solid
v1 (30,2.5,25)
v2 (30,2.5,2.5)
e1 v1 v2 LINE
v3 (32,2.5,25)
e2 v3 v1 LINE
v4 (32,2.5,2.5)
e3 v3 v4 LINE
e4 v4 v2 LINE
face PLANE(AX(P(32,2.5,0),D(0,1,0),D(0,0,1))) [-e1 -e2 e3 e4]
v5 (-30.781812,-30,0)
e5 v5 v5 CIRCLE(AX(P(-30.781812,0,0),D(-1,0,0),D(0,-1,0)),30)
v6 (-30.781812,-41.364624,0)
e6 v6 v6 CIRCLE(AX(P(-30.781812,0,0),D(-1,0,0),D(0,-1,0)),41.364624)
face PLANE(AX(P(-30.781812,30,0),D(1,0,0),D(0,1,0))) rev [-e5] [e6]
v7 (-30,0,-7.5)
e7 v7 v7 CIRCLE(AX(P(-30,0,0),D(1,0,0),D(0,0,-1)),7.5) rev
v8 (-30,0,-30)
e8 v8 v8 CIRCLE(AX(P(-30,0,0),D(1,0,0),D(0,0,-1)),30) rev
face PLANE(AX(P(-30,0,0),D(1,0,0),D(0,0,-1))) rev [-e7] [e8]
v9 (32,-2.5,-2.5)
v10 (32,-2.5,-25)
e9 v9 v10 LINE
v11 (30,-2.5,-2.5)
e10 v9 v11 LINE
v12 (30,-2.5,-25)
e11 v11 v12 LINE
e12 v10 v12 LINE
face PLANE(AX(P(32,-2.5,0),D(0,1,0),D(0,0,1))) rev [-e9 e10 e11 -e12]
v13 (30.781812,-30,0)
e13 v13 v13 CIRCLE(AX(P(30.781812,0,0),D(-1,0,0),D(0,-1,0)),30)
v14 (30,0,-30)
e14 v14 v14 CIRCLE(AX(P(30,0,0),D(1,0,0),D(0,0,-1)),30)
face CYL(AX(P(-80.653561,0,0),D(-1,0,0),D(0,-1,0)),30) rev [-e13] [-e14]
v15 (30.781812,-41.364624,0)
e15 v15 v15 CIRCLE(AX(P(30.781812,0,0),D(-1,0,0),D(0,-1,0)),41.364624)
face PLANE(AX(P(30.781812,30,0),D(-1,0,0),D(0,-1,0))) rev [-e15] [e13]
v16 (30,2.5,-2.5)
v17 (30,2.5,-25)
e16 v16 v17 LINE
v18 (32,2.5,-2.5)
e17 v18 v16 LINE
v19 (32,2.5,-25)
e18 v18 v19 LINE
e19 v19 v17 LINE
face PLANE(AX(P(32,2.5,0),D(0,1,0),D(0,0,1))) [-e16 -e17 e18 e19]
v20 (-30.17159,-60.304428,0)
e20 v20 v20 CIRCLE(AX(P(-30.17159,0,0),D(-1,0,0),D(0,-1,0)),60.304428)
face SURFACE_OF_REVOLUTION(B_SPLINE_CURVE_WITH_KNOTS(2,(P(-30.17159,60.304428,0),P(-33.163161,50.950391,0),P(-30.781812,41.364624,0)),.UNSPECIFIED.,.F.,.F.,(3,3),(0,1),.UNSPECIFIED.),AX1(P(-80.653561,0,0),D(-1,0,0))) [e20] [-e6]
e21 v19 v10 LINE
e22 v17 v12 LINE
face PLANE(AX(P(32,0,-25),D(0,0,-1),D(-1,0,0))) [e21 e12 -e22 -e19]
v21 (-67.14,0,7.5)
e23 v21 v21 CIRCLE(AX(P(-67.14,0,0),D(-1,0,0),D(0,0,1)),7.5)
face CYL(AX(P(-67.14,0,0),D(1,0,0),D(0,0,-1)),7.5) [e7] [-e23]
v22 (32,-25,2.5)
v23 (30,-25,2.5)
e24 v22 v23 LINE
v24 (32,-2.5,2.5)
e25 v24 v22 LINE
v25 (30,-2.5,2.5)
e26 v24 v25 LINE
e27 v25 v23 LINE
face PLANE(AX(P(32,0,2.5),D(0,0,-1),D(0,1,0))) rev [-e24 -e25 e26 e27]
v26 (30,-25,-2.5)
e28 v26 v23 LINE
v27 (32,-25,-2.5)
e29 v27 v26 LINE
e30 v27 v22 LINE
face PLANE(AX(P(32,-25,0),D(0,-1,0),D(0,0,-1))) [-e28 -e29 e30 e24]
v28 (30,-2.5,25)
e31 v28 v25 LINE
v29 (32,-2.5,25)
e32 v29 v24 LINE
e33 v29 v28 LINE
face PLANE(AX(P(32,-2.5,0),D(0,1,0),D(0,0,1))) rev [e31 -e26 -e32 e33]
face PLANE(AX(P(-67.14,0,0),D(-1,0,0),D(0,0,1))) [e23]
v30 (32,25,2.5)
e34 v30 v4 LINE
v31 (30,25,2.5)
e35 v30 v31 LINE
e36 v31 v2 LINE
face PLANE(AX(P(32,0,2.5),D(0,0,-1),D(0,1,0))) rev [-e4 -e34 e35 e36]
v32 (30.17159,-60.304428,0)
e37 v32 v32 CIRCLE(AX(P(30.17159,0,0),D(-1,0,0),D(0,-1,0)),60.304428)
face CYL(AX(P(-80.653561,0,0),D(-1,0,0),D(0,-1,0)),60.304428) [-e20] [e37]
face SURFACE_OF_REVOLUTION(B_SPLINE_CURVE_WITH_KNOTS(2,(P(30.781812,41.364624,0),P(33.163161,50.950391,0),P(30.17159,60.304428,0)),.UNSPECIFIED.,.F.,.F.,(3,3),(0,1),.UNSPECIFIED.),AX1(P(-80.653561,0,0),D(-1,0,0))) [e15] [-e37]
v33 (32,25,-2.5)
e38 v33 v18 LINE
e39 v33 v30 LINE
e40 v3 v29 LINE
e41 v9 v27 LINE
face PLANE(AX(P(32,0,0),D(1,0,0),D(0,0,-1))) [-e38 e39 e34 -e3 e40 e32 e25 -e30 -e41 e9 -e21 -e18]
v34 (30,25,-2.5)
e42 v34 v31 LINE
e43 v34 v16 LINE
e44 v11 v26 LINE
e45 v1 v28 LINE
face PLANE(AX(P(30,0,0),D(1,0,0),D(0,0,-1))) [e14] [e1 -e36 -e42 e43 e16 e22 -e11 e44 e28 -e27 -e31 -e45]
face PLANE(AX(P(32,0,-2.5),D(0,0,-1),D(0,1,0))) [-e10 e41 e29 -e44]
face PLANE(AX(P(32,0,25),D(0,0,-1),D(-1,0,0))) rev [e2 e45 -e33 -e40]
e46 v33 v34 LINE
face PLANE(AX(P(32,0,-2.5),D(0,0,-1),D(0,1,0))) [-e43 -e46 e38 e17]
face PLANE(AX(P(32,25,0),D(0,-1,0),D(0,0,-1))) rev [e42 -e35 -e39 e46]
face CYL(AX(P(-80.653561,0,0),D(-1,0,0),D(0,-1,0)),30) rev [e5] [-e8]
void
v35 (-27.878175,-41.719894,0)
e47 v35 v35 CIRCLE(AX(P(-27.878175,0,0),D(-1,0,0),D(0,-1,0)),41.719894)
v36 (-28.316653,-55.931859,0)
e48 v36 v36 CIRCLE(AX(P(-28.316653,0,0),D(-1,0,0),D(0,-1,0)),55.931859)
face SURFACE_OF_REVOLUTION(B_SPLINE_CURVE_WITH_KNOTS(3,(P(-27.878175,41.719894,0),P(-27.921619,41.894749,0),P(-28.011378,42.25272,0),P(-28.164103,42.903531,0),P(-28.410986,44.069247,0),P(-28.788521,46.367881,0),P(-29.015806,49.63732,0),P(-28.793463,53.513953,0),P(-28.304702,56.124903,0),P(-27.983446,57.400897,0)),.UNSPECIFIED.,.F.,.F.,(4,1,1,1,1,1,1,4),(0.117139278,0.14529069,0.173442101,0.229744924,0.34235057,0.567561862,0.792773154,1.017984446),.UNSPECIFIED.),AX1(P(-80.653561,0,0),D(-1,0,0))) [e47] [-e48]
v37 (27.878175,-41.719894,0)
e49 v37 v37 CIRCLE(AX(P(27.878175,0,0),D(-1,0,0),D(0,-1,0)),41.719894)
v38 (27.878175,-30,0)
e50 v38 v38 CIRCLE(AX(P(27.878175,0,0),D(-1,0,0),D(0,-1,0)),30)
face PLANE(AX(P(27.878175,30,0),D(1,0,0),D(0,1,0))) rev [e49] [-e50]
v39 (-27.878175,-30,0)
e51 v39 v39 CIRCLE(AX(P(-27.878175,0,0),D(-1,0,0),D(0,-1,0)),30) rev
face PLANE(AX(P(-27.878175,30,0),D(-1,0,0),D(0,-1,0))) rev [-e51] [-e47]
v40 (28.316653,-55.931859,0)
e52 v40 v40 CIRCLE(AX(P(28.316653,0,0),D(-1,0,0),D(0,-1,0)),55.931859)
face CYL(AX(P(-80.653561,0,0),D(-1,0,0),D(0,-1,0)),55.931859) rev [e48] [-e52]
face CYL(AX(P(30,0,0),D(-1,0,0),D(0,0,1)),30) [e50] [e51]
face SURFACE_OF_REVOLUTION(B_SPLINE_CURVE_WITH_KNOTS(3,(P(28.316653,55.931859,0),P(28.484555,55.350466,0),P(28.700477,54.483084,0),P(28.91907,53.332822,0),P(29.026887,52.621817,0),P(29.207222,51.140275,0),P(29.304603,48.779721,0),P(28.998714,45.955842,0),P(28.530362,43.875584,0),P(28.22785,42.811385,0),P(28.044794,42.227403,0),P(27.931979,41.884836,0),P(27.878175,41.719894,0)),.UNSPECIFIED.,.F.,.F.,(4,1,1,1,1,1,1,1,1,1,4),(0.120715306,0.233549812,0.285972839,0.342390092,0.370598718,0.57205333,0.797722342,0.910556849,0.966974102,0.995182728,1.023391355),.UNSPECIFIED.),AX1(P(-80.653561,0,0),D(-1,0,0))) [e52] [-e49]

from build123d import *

# Parameters (mm, degrees)
REVOLVE_1_OUTLINE_W   = 0.355269541
REVOLVE_1_OUTLINE_H   = 0.438478825
REVOLVE_1_OUTLINE_W_2 = 11.364624133
REVOLVE_1_OUTLINE_W_3 = 4.372569082
REVOLVE_1_OUTLINE_H_2 = 55.75634902
REVOLVE_1_OUTLINE_H_3 = 1.854936884
REVOLVE_1_OUTLINE_W_4 = 14.211965544
REVOLVE_1_OUTLINE_H_4 = 0.61022171
SKETCH_2_R            = 30
EXTRUDE_1_DEPTH       = 30
SKETCH_3_R            = 7.5
EXTRUDE_2_DEPTH       = 37.14
SKETCH_4_W            = 5
SKETCH_4_H            = 22.5
SKETCH_4_W_2          = 22.5
SKETCH_4_H_2          = 5
EXTRUDE_3_DEPTH       = 2


# Read off the part's stored shape, not the designer's step: 회전1
with BuildPart() as part:
    # 회전1 outline → 회전1 (revolve)
    with BuildSketch(Plane.YX):
        with Locations((41.542258903, -28.097413923)):
            Rectangle(REVOLVE_1_OUTLINE_W, REVOLVE_1_OUTLINE_H)
        with BuildLine():
            add(Edge.make_bspline(
                [(41.719893674, -27.87817451), (41.894749248, -27.921618592), (42.252720208, -28.01137838), (42.873298399, -28.15700866), (43.341279515, -28.256769587), (43.642191366, -28.316653335)],
                knots=[0.117139278, 0.117139278, 0.117139278, 0.117139278, 0.14529069, 0.173442101, 0.224513922, 0.224513922, 0.224513922, 0.224513922], degree=3))
            Line((41.719893674, -27.87817451), (41.719893674, -28.316653335))
            Line((41.719893674, -28.316653335), (43.642191366, -28.316653335))
        make_face()
        with BuildLine():
            add(Edge.make_bspline(
                [(43.642191366, -28.316653335), (43.673012094, -28.322786894), (44.367114713, -28.459908676), (46.367881136, -28.788520691), (49.637320271, -29.015805628), (53.021708434, -28.821695589), (55.131271584, -28.478533008), (55.931859218, -28.316653335)],
                knots=[0.224513922, 0.224513922, 0.224513922, 0.224513922, 0.229744924, 0.34235057, 0.567561862, 0.792773154, 0.932194296, 0.932194296, 0.932194296, 0.932194296], degree=3))
            Line((43.642191366, -28.316653335), (41.719893674, -28.316653335))
            Line((41.719893674, -28.316653335), (41.719893674, -30.171590219))
            Line((41.719893674, -30.171590219), (55.931859218, -30.171590219))
            Line((55.931859218, -30.171590219), (55.931859218, -28.316653335))
        make_face()
        with Locations((35.682312067, -28.097413923)):
            Rectangle(REVOLVE_1_OUTLINE_W_2, REVOLVE_1_OUTLINE_H)
        with Locations((58.118143759, -28.097413923)):
            Rectangle(REVOLVE_1_OUTLINE_W_3, REVOLVE_1_OUTLINE_H)
        with Locations((58.118143759, 0)):
            Rectangle(REVOLVE_1_OUTLINE_W_3, REVOLVE_1_OUTLINE_H_2)
        with BuildLine():
            Line((41.719893674, 28.316653335), (41.719893674, 27.87817451))
            add(Edge.make_bspline(
                [(43.128876316, 28.316653335), (42.973861456, 28.272694047), (42.669494175, 28.183372992), (42.227403007, 28.044794313), (41.884836208, 27.931979132), (41.719893674, 27.87817451)],
                knots=[0.937972384, 0.937972384, 0.937972384, 0.937972384, 0.966974102, 0.995182728, 1.023391355, 1.023391355, 1.023391355, 1.023391355], degree=3))
            Line((43.128876316, 28.316653335), (41.719893674, 28.316653335))
        make_face()
        with Locations((41.542258903, 28.097413923)):
            Rectangle(REVOLVE_1_OUTLINE_W, REVOLVE_1_OUTLINE_H)
        with Locations((41.542258903, -29.244121777)):
            Rectangle(REVOLVE_1_OUTLINE_W, REVOLVE_1_OUTLINE_H_3)
        with Locations((58.118143759, -29.244121777)):
            Rectangle(REVOLVE_1_OUTLINE_W_3, REVOLVE_1_OUTLINE_H_3)
        with Locations((35.682312067, -29.244121777)):
            Rectangle(REVOLVE_1_OUTLINE_W_2, REVOLVE_1_OUTLINE_H_3)
        with Locations((35.682312067, 28.097413923)):
            Rectangle(REVOLVE_1_OUTLINE_W_2, REVOLVE_1_OUTLINE_H)
        with Locations((58.118143759, 28.097413923)):
            Rectangle(REVOLVE_1_OUTLINE_W_3, REVOLVE_1_OUTLINE_H)
        with BuildLine():
            Line((41.719893674, 28.316653335), (43.128876316, 28.316653335))
            add(Edge.make_bspline(
                [(55.931859218, 28.316653335), (55.350466054, 28.484554725), (54.483083768, 28.700477141), (53.332821917, 28.919070087), (52.621816991, 29.026887301), (51.140275095, 29.207221888), (48.779721438, 29.304602769), (45.95584246, 28.998713875), (44.028351242, 28.564756145), (43.275412999, 28.358208372), (43.128876316, 28.316653335)],
                knots=[0.120715306, 0.120715306, 0.120715306, 0.120715306, 0.233549812, 0.285972839, 0.342390092, 0.370598718, 0.57205333, 0.797722342, 0.910556849, 0.937972384, 0.937972384, 0.937972384, 0.937972384], degree=3))
            Line((55.931859218, 28.316653335), (55.931859218, 30.171590219))
            Line((55.931859218, 30.171590219), (41.719893674, 30.171590219))
            Line((41.719893674, 30.171590219), (41.719893674, 28.316653335))
        make_face()
        with Locations((41.542258903, 29.244121777)):
            Rectangle(REVOLVE_1_OUTLINE_W, REVOLVE_1_OUTLINE_H_3)
        with Locations((48.825876446, -30.476701074)):
            Rectangle(REVOLVE_1_OUTLINE_W_4, REVOLVE_1_OUTLINE_H_4)
        with Locations((41.542258903, -30.476701074)):
            Rectangle(REVOLVE_1_OUTLINE_W, REVOLVE_1_OUTLINE_H_4)
        with BuildLine():
            Line((60.3044283, -30.171590219), (55.931859218, -30.171590219))
            Line((55.931859218, -30.171590219), (55.931859218, -30.781811929))
            Line((55.931859218, -30.781811929), (58.176696805, -30.781811929))
            add(Edge.make_bspline(
                [(60.3044283, -30.171590219), (59.242057092, -30.511353598), (58.176696805, -30.781811929)],
                knots=[0, 0, 0, 0.113573553, 0.113573553, 0.113573553], degree=2))
        make_face()
        with Locations((35.682312067, -30.476701074)):
            Rectangle(REVOLVE_1_OUTLINE_W_2, REVOLVE_1_OUTLINE_H_4)
        with Locations((35.682312067, 29.244121777)):
            Rectangle(REVOLVE_1_OUTLINE_W_2, REVOLVE_1_OUTLINE_H_3)
        with Locations((58.118143759, 29.244121777)):
            Rectangle(REVOLVE_1_OUTLINE_W_3, REVOLVE_1_OUTLINE_H_3)
        with Locations((41.542258903, 30.476701074)):
            Rectangle(REVOLVE_1_OUTLINE_W, REVOLVE_1_OUTLINE_H_4)
        with Locations((48.825876446, 30.476701074)):
            Rectangle(REVOLVE_1_OUTLINE_W_4, REVOLVE_1_OUTLINE_H_4)
        with BuildLine():
            Line((55.931859218, -30.781811929), (41.719893674, -30.781811929))
            Line((41.719893674, -30.781811929), (41.719893674, -30.868243844))
            add(Edge.make_bspline(
                [(49.816181075, -31.837257545), (45.788933817, -31.837257541), (41.719893674, -30.868243844)],
                knots=[0.556786778, 0.556786778, 0.556786778, 0.981464752, 0.981464752, 0.981464752], degree=2))
            add(Edge.make_bspline(
                [(55.931859218, -31.274158213), (52.886163188, -31.837257547), (49.816181075, -31.837257545)],
                knots=[0.233053543, 0.233053543, 0.233053543, 0.556786778, 0.556786778, 0.556786778], degree=2))
            Line((55.931859218, -31.274158213), (55.931859218, -30.781811929))
        make_face()
        with BuildLine():
            Line((41.719893674, -30.868243844), (41.719893674, -30.781811929))
            Line((41.719893674, -30.781811929), (41.364624133, -30.781811929))
            add(Edge.make_bspline(
                [(41.719893674, -30.868243844), (41.54229871, -30.825950834), (41.364624133, -30.781811929)],
                knots=[0.981464752, 0.981464752, 0.981464752, 1, 1, 1], degree=2))
        make_face()
        with BuildLine():
            Line((58.176696805, -30.781811929), (55.931859218, -30.781811929))
            Line((55.931859218, -30.781811929), (55.931859218, -31.274158213))
            add(Edge.make_bspline(
                [(58.176696805, -30.781811929), (57.055932041, -31.066335551), (55.931859218, -31.274158213)],
                knots=[0.113573553, 0.113573553, 0.113573553, 0.233053543, 0.233053543, 0.233053543], degree=2))
        make_face()
        with Locations((35.682312067, 30.476701074)):
            Rectangle(REVOLVE_1_OUTLINE_W_2, REVOLVE_1_OUTLINE_H_4)
        with BuildLine():
            Line((55.931859218, 30.781811929), (55.931859218, 30.171590219))
            Line((55.931859218, 30.171590219), (60.3044283, 30.171590219))
            add(Edge.make_bspline(
                [(58.176696805, 30.781811929), (59.242057092, 30.511353598), (60.3044283, 30.171590219)],
                knots=[0.886426447, 0.886426447, 0.886426447, 1, 1, 1], degree=2))
            Line((58.176696805, 30.781811929), (55.931859218, 30.781811929))
        make_face()
        with BuildLine():
            Line((41.364624133, 30.781811929), (41.719893674, 30.781811929))
            Line((41.719893674, 30.781811929), (41.719893674, 30.868243844))
            add(Edge.make_bspline(
                [(41.364624133, 30.781811929), (41.54229871, 30.825950834), (41.719893674, 30.868243844)],
                knots=[0, 0, 0, 0.018535248, 0.018535248, 0.018535248], degree=2))
        make_face()
        with BuildLine():
            Line((41.719893674, 30.868243844), (41.719893674, 30.781811929))
            Line((41.719893674, 30.781811929), (55.931859218, 30.781811929))
            Line((55.931859218, 30.781811929), (55.931859218, 31.274158213))
            add(Edge.make_bspline(
                [(49.816181262, 31.837257545), (52.886163281, 31.83725753), (55.931859218, 31.274158213)],
                knots=[0.443213232, 0.443213232, 0.443213232, 0.766946457, 0.766946457, 0.766946457], degree=2))
            add(Edge.make_bspline(
                [(41.719893674, 30.868243844), (45.788933912, 31.837257564), (49.816181262, 31.837257545)],
                knots=[0.018535248, 0.018535248, 0.018535248, 0.443213232, 0.443213232, 0.443213232], degree=2))
        make_face()
        with BuildLine():
            Line((55.931859218, 31.274158213), (55.931859218, 30.781811929))
            Line((55.931859218, 30.781811929), (58.176696805, 30.781811929))
            add(Edge.make_bspline(
                [(55.931859218, 31.274158213), (57.055932041, 31.066335551), (58.176696805, 30.781811929)],
                knots=[0.766946457, 0.766946457, 0.766946457, 0.886426447, 0.886426447, 0.886426447], degree=2))
        make_face()
    revolve(axis=Axis((0, 0, 0), (1, 0, 0)))

    # 스케치2 → 보스-돌출1 (add, symmetric)
    with BuildSketch(Plane(origin=(0, 0, 0), x_dir=(0, 0, -1), z_dir=(1, 0, 0))):
        with Locations(Location((0, 0, 0), (0, 0, 270))):
            Circle(SKETCH_2_R)
    extrude(amount=EXTRUDE_1_DEPTH, both=True)

    # 스케치3 → 보스-돌출2 (add)
    with BuildSketch(Plane.ZY.offset(30)):
        with Locations(Location((0, 0, 0), (0, 0, 180))):
            Circle(SKETCH_3_R)
    extrude(amount=EXTRUDE_2_DEPTH)

    # 스케치4 → 보스-돌출3 (add)
    with BuildSketch(Plane(origin=(30, 0, 0), x_dir=(0, 0, -1), z_dir=(1, 0, 0))):
        with Locations((0, 13.75)):
            Rectangle(SKETCH_4_W, SKETCH_4_H)
        with Locations((-13.75, 0)):
            Rectangle(SKETCH_4_W_2, SKETCH_4_H_2)
        Rectangle(SKETCH_4_W, SKETCH_4_H_2)
        with Locations((13.75, 0)):
            Rectangle(SKETCH_4_W_2, SKETCH_4_H_2)
        with Locations((0, -13.75)):
            Rectangle(SKETCH_4_W, SKETCH_4_H)
    extrude(amount=EXTRUDE_3_DEPTH)


solid = part.part
